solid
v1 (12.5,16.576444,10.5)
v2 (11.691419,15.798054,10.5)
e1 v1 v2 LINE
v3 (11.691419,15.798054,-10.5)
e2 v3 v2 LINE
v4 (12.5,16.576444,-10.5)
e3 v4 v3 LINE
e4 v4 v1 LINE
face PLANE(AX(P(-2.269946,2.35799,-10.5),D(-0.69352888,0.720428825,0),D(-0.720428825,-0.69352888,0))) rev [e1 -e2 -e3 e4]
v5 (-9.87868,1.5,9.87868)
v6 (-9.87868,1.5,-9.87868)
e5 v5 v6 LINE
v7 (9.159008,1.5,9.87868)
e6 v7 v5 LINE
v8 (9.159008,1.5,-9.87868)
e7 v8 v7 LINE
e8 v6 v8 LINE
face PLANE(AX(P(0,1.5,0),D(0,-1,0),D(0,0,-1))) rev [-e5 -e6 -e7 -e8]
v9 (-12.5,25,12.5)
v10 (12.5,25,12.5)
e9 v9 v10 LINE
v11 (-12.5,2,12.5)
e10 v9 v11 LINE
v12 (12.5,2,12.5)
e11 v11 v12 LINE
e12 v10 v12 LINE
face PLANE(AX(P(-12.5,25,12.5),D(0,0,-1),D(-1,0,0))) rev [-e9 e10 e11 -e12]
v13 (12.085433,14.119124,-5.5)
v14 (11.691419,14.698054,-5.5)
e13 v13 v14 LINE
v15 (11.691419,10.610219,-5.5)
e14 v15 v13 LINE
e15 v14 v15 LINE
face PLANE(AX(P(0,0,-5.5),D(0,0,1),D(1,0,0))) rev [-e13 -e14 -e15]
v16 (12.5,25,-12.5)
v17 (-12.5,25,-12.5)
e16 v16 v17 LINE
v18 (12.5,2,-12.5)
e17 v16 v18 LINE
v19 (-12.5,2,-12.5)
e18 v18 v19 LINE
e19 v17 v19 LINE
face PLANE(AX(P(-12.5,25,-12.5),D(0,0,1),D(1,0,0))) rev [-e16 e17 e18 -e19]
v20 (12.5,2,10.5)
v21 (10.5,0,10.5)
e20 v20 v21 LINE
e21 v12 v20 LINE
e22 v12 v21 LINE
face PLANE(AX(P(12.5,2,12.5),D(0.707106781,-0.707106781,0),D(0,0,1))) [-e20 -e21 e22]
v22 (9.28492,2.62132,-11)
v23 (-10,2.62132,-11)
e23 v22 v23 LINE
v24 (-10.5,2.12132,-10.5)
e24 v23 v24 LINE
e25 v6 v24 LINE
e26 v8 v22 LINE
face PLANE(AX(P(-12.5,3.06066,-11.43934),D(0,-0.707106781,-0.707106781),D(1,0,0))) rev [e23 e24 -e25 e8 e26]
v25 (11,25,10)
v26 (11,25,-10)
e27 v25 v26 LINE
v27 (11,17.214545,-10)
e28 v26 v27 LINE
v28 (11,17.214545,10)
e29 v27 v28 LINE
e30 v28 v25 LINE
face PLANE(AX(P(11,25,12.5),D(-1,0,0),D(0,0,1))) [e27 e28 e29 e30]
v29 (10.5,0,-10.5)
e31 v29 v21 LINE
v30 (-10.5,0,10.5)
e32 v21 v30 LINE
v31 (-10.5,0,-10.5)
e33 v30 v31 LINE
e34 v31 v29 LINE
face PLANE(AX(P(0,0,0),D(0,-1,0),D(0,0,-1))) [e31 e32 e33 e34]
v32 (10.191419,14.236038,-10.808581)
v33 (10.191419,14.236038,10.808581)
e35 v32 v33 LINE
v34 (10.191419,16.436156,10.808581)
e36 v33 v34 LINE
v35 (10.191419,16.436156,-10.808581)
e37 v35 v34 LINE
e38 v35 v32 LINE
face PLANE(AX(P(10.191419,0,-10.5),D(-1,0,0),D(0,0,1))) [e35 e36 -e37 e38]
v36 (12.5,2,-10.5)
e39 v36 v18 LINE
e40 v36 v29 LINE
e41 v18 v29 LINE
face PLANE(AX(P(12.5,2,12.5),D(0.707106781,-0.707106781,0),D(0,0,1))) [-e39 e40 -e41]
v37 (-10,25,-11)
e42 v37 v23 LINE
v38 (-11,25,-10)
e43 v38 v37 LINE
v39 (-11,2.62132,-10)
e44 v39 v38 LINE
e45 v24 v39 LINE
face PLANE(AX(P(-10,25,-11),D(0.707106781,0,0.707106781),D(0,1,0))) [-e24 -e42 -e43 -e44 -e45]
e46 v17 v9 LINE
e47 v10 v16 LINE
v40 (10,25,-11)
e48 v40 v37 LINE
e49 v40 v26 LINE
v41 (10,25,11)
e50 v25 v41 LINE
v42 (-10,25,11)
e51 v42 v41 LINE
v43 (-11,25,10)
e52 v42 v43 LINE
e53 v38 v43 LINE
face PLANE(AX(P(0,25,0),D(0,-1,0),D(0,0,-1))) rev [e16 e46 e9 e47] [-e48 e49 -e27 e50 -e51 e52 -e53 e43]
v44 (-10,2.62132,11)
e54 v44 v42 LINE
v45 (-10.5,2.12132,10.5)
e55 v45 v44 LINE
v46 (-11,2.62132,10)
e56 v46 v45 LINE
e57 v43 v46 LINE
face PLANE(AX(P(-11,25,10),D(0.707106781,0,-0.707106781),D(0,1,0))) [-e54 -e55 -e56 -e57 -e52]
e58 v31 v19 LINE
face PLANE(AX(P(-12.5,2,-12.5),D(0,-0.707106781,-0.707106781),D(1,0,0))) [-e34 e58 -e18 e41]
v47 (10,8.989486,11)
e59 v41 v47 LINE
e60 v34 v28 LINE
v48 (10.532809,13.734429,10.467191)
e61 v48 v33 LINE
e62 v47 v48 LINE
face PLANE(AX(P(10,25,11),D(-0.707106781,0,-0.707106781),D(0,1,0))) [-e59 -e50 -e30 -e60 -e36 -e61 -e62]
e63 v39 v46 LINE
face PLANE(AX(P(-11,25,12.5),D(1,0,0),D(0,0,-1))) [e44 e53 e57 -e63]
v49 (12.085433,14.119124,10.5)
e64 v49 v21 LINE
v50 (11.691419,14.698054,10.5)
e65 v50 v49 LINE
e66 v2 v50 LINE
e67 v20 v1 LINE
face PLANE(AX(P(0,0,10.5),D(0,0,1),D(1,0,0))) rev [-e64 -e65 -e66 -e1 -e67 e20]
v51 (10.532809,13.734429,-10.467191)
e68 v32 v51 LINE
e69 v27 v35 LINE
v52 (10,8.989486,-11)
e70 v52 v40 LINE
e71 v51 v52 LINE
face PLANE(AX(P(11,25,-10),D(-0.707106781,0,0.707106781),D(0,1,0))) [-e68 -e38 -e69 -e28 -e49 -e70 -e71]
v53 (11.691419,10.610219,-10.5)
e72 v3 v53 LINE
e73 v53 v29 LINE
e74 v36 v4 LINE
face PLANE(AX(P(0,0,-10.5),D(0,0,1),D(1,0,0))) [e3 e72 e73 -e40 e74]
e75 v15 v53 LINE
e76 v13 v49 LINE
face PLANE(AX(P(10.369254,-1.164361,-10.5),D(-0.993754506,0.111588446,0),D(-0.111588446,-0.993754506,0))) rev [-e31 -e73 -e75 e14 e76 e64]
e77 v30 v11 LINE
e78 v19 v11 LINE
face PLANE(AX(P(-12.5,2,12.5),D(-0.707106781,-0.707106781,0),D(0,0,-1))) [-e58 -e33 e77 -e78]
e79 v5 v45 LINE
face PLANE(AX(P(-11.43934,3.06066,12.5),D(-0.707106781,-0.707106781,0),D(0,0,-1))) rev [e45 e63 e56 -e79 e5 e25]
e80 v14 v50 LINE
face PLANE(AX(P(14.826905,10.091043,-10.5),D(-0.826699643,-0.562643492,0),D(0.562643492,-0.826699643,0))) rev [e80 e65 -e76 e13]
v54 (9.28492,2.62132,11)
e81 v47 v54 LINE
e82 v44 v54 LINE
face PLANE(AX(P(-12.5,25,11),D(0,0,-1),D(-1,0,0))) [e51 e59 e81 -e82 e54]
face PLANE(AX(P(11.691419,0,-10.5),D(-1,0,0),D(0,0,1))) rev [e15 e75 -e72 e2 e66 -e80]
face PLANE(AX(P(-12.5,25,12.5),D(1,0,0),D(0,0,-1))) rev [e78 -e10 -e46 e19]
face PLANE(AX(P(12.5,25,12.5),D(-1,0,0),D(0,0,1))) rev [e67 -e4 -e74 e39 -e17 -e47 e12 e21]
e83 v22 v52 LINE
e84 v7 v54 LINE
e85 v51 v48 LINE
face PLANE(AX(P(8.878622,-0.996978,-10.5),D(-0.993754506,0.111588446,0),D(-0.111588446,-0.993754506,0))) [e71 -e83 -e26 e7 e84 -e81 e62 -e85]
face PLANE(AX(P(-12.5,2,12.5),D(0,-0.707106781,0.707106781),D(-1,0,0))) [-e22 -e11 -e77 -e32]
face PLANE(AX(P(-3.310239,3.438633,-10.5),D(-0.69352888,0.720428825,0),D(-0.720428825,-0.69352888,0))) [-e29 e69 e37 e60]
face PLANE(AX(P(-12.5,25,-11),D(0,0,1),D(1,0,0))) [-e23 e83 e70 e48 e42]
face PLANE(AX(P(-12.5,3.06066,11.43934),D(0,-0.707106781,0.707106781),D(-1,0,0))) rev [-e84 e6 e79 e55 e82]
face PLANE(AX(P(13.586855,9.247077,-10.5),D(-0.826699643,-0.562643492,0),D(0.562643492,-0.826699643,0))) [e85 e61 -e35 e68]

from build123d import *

# Parameters (mm, degrees)
SKIZZE1_W                       = 25
SKIZZE1_H                       = 25
AUFSATZ_LINEAR_AUSTRAGEN1_DEPTH = 25
FASE1_SIZE                      = 2
SCHNITT_LINEAR_START            = -2
SCHNITT_LINEAR_AUSTRAGEN1_DEPTH = 21
WANDUNG1_START                  = -11
WANDUNG1_DEPTH                  = 22
WANDUNG1_START_2                = -12
WANDUNG1_2_DEPTH                = 22
FASE2_SIZE                      = 1
SCHNITT_LINEAR_AUSTRAGEN2_DEPTH = 5


with BuildPart() as part:
    # Skizze1 → Aufsatz-Linear austragen1 (new body)
    with BuildSketch(Plane(origin=(0, 0, 0), x_dir=(1, 0, 0), z_dir=(0, 1, 0))):
        Rectangle(SKIZZE1_W, SKIZZE1_H)
    extrude(amount=AUFSATZ_LINEAR_AUSTRAGEN1_DEPTH)

    # Fase1
    fase1_edges = [part.edges().sort_by_distance(p)[0] for p in [
        (0, 0, 12.5),
        (-12.5, 0, 0),
        (0, 0, -12.5),
        (12.5, 0, 0),
    ]]
    chamfer(fase1_edges, length=FASE1_SIZE)

    # Skizze3 → Schnitt-Linear austragen1 (cut)
    with BuildSketch(Plane.XY.offset(12.5).offset(SCHNITT_LINEAR_START)):
        Polygon((11.691418824, 15.798054248), (11.691418824, 14.698054248), (12.085432918, 14.119124044), (10.5, 0), (12.5, 0), (12.5, 16.576443976), align=None)
    extrude(amount=-SCHNITT_LINEAR_AUSTRAGEN1_DEPTH, mode=Mode.SUBTRACT)

    # Wandung1: read off the stored shape, not the designer's step
    # Wandung1 outline → Wandung1 (cut)
    with BuildSketch(Plane.XY.offset(WANDUNG1_START)):
        Polygon((10.191418824, 14.236037823), (10.191418824, 16.4361557), (11, 17.214545429), (11, 25), (-11, 25), (-11, 2.621320344), (-9.878679656, 1.5), (9.159007508, 1.5), (10.532808529, 13.734429342), align=None)
    extrude(amount=WANDUNG1_DEPTH, mode=Mode.SUBTRACT)

    # Wandung1 2 outline → Wandung1 2 (add)
    with BuildSketch(Plane.YZ.offset(WANDUNG1_START_2)):
        Polygon((2.621320344, -11), (1.5, -9.878679656), (1.5, -11), align=None)
        Polygon((1.5, 9.878679656), (2.621320344, 11), (1.5, 11), align=None)
    extrude(amount=WANDUNG1_2_DEPTH)

    # Fase2
    fase2_edges = [part.edges().sort_by_distance(p)[0] for p in [
        (11, 21.107272714, 11),
        (-11, 13.810660172, 11),
        (-11, 13.810660172, -11),
        (11, 21.107272714, -11),
    ]]
    chamfer(fase2_edges, length=FASE2_SIZE)

    # Skizze4 → Schnitt-Linear austragen2 (cut)
    with BuildSketch(Plane.XY.offset(-10.5)):
        Polygon((11.691418824, 15.798054248), (11.691418824, 11.720195976), (11.691418824, 10.610218801), (10.5, 0), (12.5, 2), (12.5, 16.576443976), align=None)
    extrude(amount=SCHNITT_LINEAR_AUSTRAGEN2_DEPTH, mode=Mode.SUBTRACT)


solid = part.part
